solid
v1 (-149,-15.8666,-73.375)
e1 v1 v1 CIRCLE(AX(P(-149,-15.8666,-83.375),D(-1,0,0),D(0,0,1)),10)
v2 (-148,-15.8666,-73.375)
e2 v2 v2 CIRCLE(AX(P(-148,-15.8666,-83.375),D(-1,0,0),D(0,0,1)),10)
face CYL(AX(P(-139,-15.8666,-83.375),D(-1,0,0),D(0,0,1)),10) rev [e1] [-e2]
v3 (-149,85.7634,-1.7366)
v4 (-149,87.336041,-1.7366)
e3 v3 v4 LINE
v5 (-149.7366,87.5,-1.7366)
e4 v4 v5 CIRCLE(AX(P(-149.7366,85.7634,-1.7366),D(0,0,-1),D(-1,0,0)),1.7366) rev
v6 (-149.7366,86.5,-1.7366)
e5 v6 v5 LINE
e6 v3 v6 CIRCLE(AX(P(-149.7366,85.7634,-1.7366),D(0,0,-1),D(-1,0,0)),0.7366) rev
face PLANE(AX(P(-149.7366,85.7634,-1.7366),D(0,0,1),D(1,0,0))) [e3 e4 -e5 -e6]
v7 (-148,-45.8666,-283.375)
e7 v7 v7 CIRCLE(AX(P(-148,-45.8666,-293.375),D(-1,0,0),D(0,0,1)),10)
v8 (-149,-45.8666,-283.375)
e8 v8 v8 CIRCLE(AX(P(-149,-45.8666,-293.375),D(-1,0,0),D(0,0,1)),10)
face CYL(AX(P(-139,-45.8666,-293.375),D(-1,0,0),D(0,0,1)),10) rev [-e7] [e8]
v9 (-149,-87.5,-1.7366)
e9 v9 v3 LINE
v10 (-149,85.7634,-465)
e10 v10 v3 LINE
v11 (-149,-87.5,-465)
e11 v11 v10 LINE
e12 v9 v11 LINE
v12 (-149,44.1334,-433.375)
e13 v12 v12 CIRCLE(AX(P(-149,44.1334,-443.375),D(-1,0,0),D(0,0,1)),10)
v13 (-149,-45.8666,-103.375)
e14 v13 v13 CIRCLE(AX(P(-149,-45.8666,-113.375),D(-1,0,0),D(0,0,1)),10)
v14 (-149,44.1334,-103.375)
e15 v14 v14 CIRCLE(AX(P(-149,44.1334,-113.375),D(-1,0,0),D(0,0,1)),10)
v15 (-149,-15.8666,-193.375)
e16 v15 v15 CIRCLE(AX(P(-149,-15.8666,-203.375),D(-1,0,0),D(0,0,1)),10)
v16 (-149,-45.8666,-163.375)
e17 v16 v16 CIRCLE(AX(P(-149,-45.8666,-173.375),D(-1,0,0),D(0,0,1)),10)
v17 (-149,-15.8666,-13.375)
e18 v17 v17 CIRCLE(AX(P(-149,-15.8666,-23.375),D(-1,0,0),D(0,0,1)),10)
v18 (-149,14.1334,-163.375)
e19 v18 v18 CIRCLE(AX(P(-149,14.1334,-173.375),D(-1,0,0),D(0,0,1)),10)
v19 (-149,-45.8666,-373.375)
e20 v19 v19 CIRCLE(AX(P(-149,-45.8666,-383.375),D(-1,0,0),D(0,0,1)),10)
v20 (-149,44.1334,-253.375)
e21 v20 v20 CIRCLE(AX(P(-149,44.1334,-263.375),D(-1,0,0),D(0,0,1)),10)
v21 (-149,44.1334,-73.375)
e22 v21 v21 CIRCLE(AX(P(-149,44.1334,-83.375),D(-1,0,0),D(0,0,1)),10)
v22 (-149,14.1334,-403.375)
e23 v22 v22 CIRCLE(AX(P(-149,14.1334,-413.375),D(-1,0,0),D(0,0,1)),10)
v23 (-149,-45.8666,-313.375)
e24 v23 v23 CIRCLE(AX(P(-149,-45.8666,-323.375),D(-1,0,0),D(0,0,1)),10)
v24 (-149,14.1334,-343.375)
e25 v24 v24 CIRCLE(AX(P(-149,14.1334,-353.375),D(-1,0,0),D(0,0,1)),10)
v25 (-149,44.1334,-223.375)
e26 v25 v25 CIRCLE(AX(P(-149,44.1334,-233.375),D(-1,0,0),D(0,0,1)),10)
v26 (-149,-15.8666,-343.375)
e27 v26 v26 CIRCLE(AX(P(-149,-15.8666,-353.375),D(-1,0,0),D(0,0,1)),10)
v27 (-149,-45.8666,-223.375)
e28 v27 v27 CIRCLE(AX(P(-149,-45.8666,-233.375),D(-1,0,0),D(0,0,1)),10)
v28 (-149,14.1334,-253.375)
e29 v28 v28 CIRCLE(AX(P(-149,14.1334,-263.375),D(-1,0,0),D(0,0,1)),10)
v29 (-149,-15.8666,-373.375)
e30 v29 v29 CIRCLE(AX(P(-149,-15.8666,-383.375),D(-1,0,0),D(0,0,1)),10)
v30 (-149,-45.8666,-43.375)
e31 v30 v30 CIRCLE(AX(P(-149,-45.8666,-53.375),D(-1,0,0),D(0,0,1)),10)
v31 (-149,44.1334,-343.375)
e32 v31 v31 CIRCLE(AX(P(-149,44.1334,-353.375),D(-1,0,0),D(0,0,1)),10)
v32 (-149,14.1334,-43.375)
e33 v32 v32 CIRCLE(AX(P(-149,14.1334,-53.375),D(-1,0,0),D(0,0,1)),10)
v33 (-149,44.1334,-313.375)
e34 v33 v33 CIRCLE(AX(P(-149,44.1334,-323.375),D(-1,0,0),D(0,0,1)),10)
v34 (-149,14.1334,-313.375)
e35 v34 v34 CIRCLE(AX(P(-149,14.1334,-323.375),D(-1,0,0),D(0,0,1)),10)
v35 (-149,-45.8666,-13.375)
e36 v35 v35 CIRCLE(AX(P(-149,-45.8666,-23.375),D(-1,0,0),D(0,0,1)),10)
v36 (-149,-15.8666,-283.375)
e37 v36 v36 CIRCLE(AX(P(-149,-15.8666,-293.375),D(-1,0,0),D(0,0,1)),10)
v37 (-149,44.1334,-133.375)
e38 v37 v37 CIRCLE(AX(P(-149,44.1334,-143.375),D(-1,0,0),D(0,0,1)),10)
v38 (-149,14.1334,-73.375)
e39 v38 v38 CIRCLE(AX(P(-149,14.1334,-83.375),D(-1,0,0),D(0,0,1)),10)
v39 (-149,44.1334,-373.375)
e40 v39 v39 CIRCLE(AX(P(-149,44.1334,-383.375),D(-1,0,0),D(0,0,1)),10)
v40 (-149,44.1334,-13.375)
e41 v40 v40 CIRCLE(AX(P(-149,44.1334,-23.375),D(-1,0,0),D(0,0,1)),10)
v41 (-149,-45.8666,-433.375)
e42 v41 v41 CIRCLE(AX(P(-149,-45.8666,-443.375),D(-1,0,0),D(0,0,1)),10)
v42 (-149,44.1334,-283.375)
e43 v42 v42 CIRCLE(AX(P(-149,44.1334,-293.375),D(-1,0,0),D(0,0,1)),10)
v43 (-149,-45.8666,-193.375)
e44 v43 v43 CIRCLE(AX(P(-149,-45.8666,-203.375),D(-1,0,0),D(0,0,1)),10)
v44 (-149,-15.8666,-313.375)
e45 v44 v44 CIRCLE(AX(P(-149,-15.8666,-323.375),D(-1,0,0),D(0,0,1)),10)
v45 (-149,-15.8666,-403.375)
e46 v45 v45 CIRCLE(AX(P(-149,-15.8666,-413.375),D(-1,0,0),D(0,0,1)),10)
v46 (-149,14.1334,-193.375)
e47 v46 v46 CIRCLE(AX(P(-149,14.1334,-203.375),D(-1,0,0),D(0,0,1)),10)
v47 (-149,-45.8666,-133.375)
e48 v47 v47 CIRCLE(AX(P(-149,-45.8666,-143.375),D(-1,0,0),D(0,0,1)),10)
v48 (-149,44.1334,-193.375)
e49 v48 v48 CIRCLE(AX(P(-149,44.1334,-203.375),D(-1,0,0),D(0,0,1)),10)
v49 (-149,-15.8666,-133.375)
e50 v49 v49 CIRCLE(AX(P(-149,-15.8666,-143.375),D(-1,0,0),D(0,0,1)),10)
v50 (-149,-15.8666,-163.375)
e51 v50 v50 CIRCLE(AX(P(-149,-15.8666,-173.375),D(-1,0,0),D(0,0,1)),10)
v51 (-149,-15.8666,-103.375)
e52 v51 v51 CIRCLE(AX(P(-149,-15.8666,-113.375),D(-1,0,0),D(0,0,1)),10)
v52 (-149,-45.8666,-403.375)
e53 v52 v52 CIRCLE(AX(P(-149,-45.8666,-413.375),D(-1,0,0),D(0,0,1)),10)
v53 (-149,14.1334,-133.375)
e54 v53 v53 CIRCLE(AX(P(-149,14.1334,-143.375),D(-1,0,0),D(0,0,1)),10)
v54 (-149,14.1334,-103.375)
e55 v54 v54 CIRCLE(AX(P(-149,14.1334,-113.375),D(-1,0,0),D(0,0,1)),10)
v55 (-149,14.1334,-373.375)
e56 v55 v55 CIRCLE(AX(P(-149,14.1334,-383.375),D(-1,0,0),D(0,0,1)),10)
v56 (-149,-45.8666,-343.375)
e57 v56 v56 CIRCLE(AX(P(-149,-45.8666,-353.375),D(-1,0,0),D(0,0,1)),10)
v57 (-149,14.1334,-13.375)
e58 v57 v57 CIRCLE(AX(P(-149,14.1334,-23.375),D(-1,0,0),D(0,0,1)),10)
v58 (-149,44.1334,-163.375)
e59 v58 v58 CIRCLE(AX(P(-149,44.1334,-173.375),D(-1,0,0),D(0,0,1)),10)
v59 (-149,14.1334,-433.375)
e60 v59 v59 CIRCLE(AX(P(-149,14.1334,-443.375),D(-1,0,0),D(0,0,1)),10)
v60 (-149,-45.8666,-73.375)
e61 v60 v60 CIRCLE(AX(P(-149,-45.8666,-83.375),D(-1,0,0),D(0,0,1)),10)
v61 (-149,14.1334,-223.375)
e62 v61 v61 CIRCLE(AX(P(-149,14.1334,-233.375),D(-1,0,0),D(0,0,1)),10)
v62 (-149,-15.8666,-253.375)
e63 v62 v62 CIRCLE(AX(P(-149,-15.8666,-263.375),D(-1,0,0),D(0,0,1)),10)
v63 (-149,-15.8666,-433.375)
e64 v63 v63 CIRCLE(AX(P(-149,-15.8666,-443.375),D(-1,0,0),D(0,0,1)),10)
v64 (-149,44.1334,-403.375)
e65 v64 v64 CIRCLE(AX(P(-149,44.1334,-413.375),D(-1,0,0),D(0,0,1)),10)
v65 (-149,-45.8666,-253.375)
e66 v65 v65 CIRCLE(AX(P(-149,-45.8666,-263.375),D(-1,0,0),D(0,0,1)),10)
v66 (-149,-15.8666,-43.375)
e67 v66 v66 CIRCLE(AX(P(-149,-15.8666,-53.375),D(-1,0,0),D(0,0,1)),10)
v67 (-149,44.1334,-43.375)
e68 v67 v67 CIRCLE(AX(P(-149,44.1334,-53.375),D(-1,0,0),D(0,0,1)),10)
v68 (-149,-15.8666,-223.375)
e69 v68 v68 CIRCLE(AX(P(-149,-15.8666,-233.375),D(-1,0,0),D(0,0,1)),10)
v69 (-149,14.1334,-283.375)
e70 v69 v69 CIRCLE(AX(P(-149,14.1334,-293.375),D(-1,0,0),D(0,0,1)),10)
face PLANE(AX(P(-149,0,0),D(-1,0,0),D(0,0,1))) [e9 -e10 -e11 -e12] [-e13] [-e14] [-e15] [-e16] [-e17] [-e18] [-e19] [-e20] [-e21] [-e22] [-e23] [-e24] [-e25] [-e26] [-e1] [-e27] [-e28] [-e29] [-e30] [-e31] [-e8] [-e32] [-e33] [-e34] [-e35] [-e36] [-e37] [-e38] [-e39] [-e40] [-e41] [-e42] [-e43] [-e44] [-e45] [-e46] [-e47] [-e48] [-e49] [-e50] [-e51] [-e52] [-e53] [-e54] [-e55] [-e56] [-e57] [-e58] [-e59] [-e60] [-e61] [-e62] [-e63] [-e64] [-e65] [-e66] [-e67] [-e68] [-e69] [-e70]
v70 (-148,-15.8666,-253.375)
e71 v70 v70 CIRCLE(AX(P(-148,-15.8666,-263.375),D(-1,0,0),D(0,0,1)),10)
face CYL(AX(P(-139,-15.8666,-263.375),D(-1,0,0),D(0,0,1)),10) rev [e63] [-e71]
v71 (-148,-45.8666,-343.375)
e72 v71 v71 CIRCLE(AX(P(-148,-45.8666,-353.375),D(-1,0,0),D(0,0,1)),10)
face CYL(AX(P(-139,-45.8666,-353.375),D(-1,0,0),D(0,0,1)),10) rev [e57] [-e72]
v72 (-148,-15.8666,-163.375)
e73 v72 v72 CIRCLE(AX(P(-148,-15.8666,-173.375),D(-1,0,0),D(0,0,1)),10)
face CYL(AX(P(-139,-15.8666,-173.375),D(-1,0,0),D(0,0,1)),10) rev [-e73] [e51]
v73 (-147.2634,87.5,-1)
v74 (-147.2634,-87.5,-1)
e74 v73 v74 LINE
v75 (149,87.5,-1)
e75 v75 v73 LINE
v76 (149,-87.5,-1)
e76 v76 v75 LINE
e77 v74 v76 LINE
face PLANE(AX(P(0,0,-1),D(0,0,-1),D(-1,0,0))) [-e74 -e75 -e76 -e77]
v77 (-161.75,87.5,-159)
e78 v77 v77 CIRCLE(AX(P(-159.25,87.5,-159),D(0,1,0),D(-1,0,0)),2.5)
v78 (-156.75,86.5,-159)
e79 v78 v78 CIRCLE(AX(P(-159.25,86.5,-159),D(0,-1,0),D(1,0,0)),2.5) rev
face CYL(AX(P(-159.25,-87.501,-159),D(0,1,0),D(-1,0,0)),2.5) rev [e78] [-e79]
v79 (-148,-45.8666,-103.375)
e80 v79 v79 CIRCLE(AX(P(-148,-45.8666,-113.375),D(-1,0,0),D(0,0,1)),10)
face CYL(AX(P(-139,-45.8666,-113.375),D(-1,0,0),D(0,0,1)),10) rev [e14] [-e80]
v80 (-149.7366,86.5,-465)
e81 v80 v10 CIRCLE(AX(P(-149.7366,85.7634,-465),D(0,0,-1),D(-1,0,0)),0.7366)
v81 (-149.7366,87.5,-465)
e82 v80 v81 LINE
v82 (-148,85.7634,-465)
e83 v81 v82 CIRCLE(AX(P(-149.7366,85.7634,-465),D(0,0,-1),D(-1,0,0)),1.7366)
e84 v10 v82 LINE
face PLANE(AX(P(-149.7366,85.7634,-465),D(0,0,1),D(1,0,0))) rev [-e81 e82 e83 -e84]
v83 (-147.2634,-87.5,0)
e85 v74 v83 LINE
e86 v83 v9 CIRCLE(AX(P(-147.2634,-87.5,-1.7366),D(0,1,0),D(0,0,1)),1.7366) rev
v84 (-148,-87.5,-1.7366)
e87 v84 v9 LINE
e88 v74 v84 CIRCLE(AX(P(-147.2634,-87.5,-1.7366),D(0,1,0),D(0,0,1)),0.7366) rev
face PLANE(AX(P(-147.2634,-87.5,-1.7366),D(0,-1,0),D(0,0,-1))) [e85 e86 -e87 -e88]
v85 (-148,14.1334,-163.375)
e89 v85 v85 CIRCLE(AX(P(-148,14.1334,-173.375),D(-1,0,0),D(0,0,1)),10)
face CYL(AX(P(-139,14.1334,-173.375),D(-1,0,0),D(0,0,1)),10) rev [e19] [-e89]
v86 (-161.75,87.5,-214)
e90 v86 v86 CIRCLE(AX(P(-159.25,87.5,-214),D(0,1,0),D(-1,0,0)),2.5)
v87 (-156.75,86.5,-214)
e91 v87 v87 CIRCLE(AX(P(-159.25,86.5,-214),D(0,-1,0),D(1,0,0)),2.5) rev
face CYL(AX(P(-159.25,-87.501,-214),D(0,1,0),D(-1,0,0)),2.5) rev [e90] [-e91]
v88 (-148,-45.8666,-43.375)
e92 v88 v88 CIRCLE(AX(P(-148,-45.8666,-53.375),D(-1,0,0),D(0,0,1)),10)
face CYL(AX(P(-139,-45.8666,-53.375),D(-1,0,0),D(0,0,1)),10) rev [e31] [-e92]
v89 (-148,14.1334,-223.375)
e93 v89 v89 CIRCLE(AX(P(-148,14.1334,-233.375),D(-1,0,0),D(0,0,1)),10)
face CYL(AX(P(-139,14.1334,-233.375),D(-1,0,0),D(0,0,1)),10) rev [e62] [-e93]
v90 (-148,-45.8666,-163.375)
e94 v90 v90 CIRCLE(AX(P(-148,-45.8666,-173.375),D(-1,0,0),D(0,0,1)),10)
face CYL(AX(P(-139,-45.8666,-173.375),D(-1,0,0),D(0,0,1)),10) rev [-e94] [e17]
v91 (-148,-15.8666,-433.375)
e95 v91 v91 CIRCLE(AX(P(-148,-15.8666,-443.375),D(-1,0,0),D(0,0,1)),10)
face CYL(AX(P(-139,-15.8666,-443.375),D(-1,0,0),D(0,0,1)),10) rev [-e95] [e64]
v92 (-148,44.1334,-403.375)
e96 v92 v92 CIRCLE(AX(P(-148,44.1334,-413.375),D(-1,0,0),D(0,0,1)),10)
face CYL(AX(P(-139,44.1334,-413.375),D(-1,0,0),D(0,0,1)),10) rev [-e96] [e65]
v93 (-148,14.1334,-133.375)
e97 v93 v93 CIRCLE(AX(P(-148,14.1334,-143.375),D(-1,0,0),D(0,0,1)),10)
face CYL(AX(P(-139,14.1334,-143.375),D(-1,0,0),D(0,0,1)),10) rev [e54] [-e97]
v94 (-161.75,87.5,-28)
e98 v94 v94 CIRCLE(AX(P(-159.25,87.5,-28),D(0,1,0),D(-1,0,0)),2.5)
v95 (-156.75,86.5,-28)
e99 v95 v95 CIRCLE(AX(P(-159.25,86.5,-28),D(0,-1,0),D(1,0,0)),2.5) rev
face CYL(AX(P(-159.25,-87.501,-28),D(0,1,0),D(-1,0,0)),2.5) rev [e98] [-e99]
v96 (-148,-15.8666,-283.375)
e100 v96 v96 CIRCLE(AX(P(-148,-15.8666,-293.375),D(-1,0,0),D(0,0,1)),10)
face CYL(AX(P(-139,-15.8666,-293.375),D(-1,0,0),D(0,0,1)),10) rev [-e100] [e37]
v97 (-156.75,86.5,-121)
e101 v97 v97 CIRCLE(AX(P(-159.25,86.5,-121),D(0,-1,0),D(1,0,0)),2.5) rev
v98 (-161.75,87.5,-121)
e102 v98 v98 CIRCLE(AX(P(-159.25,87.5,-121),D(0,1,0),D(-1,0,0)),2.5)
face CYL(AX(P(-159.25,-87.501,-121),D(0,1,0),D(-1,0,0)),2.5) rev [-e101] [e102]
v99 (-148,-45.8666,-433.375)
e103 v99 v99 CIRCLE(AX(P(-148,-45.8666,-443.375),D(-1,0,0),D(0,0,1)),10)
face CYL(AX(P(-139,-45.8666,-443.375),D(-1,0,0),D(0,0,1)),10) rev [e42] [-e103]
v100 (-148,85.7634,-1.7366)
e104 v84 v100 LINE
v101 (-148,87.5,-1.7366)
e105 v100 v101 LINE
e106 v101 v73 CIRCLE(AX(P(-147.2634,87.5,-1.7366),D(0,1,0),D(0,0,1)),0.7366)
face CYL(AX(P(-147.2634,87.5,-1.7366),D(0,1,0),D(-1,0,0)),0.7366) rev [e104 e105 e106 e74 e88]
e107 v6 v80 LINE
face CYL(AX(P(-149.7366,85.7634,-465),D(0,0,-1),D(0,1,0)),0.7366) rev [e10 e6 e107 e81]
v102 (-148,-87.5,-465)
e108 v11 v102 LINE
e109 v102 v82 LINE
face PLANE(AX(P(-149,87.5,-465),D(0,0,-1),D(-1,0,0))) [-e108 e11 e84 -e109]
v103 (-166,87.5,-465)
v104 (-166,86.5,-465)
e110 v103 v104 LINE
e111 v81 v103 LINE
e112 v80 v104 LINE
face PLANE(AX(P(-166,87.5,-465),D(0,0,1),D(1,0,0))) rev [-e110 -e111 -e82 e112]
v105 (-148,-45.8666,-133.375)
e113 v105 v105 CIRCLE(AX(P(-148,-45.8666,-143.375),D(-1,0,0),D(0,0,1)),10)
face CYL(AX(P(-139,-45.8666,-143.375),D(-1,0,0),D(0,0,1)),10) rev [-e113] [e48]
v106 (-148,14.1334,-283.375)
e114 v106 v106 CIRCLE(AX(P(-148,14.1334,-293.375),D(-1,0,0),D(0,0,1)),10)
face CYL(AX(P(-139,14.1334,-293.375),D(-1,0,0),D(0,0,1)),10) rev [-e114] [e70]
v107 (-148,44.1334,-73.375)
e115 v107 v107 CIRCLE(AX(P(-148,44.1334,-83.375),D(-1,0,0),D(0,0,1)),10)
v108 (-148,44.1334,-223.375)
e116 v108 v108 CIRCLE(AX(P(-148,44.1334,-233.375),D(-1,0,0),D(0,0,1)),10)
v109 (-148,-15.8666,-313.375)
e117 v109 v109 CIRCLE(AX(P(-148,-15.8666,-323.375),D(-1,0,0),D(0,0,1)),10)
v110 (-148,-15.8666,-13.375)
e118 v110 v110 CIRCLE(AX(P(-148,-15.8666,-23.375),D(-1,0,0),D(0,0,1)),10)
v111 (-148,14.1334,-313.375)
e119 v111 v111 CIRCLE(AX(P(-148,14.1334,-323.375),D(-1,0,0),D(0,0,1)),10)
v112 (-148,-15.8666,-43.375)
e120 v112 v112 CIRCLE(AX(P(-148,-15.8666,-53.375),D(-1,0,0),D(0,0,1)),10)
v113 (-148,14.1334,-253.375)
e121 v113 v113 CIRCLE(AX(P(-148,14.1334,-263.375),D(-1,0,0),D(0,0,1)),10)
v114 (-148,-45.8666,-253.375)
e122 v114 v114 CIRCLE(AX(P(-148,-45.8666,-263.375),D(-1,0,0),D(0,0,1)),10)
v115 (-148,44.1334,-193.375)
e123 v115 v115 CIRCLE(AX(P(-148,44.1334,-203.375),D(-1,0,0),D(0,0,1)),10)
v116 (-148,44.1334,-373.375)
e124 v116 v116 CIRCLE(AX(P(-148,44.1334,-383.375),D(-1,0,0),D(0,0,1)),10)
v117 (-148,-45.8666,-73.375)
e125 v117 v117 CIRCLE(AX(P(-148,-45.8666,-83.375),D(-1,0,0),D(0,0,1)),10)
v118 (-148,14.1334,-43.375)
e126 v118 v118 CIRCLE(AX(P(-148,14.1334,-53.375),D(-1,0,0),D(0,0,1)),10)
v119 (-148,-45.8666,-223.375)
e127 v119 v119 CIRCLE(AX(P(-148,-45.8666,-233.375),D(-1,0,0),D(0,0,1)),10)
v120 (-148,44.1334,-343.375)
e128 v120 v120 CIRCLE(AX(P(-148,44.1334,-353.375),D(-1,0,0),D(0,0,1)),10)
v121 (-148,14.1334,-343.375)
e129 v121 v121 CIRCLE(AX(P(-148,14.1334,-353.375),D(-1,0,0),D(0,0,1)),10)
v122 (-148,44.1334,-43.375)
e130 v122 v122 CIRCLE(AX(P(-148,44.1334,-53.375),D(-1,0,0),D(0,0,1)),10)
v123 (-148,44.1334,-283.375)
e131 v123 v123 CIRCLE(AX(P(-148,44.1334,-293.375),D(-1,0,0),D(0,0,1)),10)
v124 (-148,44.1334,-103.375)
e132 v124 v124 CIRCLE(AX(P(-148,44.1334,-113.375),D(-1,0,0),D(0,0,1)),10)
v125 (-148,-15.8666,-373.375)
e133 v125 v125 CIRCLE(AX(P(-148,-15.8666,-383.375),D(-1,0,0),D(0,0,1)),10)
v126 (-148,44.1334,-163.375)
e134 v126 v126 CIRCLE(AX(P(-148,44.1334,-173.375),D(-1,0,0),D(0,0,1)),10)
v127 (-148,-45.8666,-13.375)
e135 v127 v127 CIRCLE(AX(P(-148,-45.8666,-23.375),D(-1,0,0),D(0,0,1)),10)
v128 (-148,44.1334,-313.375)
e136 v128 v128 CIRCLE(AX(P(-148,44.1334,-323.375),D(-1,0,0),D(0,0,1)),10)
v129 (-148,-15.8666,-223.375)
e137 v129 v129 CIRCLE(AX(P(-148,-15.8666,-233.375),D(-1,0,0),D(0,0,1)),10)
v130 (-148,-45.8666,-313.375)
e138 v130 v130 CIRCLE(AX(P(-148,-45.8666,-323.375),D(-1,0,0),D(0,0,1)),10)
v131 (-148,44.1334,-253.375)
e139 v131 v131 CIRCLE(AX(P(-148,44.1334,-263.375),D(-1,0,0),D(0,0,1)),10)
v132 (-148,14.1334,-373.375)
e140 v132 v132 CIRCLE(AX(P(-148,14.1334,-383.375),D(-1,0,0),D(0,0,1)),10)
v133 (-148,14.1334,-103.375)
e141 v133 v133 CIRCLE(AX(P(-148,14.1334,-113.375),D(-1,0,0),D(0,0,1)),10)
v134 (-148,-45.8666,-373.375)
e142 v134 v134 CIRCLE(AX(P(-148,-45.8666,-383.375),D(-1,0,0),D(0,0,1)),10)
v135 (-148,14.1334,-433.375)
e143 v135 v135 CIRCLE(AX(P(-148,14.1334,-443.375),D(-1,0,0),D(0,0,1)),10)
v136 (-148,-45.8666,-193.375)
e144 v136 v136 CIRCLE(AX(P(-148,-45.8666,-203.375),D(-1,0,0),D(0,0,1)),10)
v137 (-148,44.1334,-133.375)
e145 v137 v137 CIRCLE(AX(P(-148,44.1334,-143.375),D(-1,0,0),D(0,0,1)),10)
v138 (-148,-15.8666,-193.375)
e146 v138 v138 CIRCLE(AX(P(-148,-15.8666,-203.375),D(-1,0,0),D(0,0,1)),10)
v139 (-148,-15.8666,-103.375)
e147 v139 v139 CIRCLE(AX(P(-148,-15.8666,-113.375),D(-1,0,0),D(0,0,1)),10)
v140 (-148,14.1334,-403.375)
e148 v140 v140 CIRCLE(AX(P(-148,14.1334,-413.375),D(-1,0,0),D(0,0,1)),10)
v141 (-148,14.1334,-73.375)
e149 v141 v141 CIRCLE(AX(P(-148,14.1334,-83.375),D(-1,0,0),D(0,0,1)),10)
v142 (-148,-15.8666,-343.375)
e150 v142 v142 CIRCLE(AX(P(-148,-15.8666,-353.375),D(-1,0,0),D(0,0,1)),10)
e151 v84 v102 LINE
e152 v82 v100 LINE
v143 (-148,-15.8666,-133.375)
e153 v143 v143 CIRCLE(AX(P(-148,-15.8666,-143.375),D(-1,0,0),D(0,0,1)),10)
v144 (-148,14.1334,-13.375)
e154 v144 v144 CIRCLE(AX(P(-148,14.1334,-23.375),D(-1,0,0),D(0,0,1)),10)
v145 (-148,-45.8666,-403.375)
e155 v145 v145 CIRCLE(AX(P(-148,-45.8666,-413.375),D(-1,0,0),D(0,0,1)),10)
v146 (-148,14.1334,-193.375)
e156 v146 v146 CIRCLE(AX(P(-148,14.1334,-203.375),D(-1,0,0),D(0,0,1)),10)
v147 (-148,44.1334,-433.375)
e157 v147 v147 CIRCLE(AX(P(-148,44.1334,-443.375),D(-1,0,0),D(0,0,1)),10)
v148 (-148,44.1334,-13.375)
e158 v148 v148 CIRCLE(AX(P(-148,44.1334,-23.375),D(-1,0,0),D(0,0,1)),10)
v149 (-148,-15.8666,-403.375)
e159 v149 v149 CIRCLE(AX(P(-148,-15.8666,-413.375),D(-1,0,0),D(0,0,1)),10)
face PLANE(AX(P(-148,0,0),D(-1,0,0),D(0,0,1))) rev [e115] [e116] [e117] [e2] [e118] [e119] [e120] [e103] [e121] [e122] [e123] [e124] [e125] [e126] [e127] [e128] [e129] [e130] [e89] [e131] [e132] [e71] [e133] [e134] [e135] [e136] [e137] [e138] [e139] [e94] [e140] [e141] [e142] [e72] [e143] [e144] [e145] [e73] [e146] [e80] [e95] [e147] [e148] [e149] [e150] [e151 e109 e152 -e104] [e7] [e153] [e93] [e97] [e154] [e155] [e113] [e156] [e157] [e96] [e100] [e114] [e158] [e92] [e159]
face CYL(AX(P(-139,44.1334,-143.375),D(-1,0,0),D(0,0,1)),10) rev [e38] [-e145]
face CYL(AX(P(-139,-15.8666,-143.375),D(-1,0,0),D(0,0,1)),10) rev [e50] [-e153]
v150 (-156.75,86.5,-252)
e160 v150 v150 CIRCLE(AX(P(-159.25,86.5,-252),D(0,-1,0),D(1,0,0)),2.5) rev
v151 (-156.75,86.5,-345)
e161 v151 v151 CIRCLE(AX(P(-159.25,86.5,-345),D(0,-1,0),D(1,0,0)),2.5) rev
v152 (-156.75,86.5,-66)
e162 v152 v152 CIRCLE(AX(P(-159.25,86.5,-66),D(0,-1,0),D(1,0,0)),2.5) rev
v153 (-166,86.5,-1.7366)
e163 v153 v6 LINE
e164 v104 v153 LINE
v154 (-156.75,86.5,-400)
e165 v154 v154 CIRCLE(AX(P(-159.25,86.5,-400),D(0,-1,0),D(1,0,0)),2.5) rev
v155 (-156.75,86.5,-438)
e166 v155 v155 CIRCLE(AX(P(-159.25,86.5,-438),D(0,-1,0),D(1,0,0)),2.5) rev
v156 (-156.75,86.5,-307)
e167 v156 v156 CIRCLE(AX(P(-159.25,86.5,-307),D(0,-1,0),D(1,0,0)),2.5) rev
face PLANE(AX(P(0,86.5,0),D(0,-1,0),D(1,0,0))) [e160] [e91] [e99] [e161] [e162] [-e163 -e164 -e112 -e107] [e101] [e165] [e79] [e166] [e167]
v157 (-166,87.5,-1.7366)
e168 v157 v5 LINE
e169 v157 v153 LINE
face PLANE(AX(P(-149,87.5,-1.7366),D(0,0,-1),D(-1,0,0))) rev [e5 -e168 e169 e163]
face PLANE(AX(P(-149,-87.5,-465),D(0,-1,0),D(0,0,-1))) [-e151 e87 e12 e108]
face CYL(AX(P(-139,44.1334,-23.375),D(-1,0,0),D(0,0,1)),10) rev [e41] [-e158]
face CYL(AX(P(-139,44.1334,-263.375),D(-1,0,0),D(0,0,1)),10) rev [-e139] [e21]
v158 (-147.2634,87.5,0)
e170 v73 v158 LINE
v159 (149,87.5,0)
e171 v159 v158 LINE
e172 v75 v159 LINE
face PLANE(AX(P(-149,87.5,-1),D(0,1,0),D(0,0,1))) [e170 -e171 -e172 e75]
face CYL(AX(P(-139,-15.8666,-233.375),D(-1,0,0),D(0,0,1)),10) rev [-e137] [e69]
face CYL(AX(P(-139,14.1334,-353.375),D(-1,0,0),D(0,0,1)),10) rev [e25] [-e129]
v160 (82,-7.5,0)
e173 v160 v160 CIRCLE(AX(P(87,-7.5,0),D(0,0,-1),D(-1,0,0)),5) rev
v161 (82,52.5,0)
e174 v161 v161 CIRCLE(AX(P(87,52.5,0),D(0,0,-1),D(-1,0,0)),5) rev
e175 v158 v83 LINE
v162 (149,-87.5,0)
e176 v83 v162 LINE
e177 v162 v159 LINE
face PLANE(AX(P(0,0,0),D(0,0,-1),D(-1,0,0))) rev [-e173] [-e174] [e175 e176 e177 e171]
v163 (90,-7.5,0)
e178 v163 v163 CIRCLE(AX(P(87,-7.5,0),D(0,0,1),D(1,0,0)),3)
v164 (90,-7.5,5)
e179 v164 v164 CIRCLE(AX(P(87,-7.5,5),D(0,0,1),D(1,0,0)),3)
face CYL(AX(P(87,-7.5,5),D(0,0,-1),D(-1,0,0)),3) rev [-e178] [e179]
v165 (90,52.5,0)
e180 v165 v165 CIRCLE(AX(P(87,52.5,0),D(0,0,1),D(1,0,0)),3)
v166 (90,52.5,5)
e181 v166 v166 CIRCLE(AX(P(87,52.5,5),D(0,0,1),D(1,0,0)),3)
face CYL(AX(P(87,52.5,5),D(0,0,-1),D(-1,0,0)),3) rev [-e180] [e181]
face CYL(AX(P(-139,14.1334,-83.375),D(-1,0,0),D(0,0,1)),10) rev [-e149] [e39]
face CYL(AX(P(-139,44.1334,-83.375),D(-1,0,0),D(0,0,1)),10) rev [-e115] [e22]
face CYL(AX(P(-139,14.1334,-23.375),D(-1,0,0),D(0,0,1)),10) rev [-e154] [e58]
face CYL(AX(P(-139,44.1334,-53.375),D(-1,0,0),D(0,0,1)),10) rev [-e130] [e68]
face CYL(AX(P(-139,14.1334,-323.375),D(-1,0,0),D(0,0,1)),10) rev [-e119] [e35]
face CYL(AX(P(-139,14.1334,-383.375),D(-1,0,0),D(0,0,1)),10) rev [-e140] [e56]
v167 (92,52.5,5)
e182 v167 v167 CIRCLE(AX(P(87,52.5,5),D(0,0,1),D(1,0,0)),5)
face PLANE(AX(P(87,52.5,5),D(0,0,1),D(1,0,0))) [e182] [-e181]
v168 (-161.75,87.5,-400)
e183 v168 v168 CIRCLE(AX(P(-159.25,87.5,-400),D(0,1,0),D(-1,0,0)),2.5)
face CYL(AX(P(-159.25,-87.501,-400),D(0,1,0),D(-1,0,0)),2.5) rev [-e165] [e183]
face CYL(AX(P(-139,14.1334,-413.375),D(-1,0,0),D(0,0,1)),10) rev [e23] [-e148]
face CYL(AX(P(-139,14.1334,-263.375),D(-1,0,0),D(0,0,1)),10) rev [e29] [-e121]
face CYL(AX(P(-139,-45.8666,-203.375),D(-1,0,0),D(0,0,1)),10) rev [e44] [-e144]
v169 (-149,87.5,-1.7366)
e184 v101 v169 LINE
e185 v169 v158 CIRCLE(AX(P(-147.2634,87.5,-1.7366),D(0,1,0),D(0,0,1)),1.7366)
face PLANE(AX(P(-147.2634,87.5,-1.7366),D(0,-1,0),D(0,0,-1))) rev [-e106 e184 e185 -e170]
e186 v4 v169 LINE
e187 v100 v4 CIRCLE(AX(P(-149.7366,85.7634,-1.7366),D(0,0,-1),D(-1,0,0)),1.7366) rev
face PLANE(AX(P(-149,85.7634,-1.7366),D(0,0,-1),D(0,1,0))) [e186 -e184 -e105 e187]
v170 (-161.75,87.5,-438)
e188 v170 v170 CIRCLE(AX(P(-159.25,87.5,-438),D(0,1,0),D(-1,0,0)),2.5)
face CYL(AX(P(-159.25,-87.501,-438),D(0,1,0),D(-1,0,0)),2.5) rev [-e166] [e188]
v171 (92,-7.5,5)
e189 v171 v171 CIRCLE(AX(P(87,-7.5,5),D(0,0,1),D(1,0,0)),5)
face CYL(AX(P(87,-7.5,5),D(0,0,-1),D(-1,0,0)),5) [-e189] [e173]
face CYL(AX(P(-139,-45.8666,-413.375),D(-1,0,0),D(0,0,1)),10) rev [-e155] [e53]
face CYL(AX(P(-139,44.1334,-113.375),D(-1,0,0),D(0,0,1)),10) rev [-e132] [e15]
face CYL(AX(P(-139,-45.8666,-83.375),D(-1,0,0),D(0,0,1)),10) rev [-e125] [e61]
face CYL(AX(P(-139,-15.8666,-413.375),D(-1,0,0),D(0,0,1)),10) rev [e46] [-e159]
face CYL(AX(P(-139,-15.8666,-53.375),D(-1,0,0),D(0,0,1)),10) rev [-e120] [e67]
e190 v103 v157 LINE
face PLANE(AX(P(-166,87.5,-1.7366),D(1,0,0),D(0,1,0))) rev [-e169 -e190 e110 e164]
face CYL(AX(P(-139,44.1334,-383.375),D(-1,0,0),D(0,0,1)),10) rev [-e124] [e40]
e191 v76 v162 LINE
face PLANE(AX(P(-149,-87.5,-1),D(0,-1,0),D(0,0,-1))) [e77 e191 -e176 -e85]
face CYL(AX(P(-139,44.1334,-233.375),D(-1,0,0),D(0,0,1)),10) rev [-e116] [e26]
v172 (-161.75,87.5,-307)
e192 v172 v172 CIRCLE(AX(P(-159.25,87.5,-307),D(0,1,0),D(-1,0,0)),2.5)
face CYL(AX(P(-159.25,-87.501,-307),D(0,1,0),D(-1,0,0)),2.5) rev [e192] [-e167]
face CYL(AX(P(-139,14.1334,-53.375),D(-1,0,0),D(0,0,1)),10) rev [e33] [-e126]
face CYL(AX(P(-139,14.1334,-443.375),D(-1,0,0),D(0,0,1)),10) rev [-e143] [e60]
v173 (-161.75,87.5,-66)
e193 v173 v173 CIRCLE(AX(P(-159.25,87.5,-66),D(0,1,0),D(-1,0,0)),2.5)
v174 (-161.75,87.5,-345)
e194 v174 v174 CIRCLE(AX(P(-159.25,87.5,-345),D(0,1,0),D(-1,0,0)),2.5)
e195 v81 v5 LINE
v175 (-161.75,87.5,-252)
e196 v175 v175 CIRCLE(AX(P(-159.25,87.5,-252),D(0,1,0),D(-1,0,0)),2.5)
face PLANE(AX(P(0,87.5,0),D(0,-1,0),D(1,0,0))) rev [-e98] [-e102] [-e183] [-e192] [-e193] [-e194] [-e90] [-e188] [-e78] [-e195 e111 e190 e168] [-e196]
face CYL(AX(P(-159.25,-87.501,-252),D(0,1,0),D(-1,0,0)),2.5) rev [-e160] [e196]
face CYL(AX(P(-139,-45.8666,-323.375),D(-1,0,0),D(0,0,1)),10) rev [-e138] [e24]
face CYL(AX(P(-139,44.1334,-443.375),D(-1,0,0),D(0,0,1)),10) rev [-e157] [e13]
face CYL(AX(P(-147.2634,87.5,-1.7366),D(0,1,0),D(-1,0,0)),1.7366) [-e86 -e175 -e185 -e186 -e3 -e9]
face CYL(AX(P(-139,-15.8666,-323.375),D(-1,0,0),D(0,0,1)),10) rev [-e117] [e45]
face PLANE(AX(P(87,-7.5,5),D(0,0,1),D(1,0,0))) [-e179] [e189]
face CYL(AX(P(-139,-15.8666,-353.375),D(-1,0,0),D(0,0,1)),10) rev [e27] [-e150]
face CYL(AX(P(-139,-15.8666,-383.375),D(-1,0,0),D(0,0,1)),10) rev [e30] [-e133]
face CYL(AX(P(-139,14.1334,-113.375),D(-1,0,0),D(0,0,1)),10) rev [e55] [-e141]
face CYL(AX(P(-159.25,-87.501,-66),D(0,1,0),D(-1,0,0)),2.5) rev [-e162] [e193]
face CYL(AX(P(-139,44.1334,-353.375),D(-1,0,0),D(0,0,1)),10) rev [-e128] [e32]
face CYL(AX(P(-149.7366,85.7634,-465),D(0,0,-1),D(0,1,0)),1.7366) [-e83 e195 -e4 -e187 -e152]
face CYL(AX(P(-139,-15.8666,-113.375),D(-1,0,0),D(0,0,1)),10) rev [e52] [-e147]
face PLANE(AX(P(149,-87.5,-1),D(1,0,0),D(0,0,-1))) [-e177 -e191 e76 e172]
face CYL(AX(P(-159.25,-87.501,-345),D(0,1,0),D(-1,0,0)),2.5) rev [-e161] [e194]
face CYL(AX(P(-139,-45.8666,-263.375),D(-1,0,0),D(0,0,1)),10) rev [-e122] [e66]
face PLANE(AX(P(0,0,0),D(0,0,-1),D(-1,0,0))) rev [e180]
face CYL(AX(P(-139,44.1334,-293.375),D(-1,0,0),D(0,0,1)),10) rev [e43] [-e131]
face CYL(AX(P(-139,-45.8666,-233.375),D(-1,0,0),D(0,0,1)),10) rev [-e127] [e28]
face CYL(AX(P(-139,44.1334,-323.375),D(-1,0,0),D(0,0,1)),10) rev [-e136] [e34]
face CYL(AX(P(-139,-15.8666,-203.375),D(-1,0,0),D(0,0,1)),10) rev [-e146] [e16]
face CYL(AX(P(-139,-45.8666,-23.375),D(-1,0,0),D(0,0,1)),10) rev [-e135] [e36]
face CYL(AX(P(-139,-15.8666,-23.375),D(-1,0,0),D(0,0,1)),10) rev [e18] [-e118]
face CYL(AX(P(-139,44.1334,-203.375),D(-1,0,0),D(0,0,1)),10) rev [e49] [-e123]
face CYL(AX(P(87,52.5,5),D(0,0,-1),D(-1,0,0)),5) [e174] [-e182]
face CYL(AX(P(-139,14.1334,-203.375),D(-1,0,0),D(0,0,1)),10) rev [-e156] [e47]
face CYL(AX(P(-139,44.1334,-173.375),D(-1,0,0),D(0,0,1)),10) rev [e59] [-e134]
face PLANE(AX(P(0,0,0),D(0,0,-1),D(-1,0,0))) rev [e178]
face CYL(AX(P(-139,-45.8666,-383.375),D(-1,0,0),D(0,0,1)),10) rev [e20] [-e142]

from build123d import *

# Parameters (mm, degrees)
SKETCH1_W                    = 298
SKETCH1_H                    = 175
BASE_FLANGE1_DEPTH           = 1
EDGE_FLANGE1_STRIP_W         = 5.4732
EDGE_FLANGE1_STRIP_H         = 1
EDGE_FLANGE1_STRIP_CUT_DEPTH = 175
EDGE_FLANGE1_DEPTH           = 175
EDGE_FLANGE2_STRIP_W         = 5.4732
EDGE_FLANGE2_STRIP_H         = 1
EDGE_FLANGE2_STRIP_CUT_DEPTH = 463.2634
EDGE_FLANGE2_DEPTH           = 463.2634
SKETCH21_R                   = 5
SKETCH21_R_2                 = 3
BOSS_EXTRUDE2_DEPTH          = 5
SKETCH22_R                   = 10
CUT_EXTRUDE1_DEPTH           = 10
SKETCH24_R                   = 2.5
CUT_EXTRUDE2_DEPTH           = 1


# Sheet-metal steps are written as plain solids
with BuildPart() as part:
    # Sketch1 → Base-Flange1 (new body)
    with BuildSketch(Plane.XY):
        Rectangle(SKETCH1_W, SKETCH1_H)
    extrude(amount=-BASE_FLANGE1_DEPTH)

    # Edge-Flange1 strip (across the edge) → Edge-Flange1 strip cut (cut)
    with BuildSketch(Plane(origin=(-149, -87.5, -1), x_dir=(1, 0, 0), z_dir=(0, 1, 0))):
        with Locations((-1, -0.5)):
            Rectangle(EDGE_FLANGE1_STRIP_W, EDGE_FLANGE1_STRIP_H)
    extrude(amount=EDGE_FLANGE1_STRIP_CUT_DEPTH, mode=Mode.SUBTRACT)

    # Edge-Flange1 section (across the edge) → Edge-Flange1 (add)
    with BuildSketch(Plane(origin=(-149, -87.5, -1), x_dir=(1, 0, 0), z_dir=(0, 1, 0))):
        with BuildLine():
            Line((0, 0.7366), (0, 464))
            Line((0, 464), (1, 464))
            Line((1, 464), (1, 0.7366))
            ThreePointArc((1, 0.7366), (1.215745145, 0.215745145), (1.7366, 0))
            Line((1.7366, 0), (1.7366, -1))
            ThreePointArc((1.7366, -1), (0.508638364, -0.491361636), (0, 0.7366))
        make_face()
    extrude(amount=EDGE_FLANGE1_DEPTH)

    # Edge-Flange2 strip (across the edge) → Edge-Flange2 strip cut (cut)
    with BuildSketch(Plane(origin=(-149, 87.5, -1.7366), x_dir=(0, -1, 0), z_dir=(0, 0, -1))):
        with Locations((-1, -0.5)):
            Rectangle(EDGE_FLANGE2_STRIP_W, EDGE_FLANGE2_STRIP_H)
    extrude(amount=EDGE_FLANGE2_STRIP_CUT_DEPTH, mode=Mode.SUBTRACT)

    # Edge-Flange2 section (across the edge) → Edge-Flange2 (add)
    with BuildSketch(Plane(origin=(-149, 87.5, -1.7366), x_dir=(0, -1, 0), z_dir=(0, 0, -1))):
        with BuildLine():
            Line((0, 0.7366), (0, 17))
            Line((0, 17), (1, 17))
            Line((1, 17), (1, 0.7366))
            ThreePointArc((1, 0.7366), (1.215745145, 0.215745145), (1.7366, 0))
            Line((1.7366, 0), (1.7366, -1))
            ThreePointArc((1.7366, -1), (0.508638364, -0.491361636), (0, 0.7366))
        make_face()
    extrude(amount=EDGE_FLANGE2_DEPTH)

    # Sketch21 → Boss-Extrude2 (add)
    # profile 1 of 2: a face of its own
    with BuildSketch(Plane.XY):
        with Locations(Location((87, 52.5, 0), (0, 0, 180))):
            Circle(SKETCH21_R)
        with Locations((87, 52.5)):
            Circle(SKETCH21_R_2, mode=Mode.SUBTRACT)
    # profile 2 of 2: a face of its own
    with BuildSketch(Plane.XY):
        with Locations(Location((87, -7.5, 0), (0, 0, 180))):
            Circle(SKETCH21_R)
        with Locations((87, -7.5)):
            Circle(SKETCH21_R_2, mode=Mode.SUBTRACT)
    extrude(amount=BOSS_EXTRUDE2_DEPTH)

    # Sketch22 → Cut-Extrude1 (cut)
    with BuildSketch(Plane.ZY.offset(149)):
        with Locations((-443.375, 44.1334)):
            Circle(SKETCH22_R)
        with Locations((-413.375, 44.1334)):
            Circle(SKETCH22_R)
        with Locations((-383.375, 44.1334)):
            Circle(SKETCH22_R)
        with Locations((-353.375, 44.1334)):
            Circle(SKETCH22_R)
        with Locations((-323.375, 44.1334)):
            Circle(SKETCH22_R)
        with Locations((-293.375, 44.1334)):
            Circle(SKETCH22_R)
        with Locations((-263.375, 44.1334)):
            Circle(SKETCH22_R)
        with Locations((-233.375, 44.1334)):
            Circle(SKETCH22_R)
        with Locations((-203.375, 44.1334)):
            Circle(SKETCH22_R)
        with Locations((-173.375, 44.1334)):
            Circle(SKETCH22_R)
        with Locations((-143.375, 44.1334)):
            Circle(SKETCH22_R)
        with Locations((-113.375, 44.1334)):
            Circle(SKETCH22_R)
        with Locations((-83.375, 44.1334)):
            Circle(SKETCH22_R)
        with Locations((-413.375, 14.1334)):
            Circle(SKETCH22_R)
        with Locations((-383.375, 14.1334)):
            Circle(SKETCH22_R)
        with Locations((-353.375, 14.1334)):
            Circle(SKETCH22_R)
        with Locations((-323.375, 14.1334)):
            Circle(SKETCH22_R)
        with Locations((-293.375, 14.1334)):
            Circle(SKETCH22_R)
        with Locations((-263.375, 14.1334)):
            Circle(SKETCH22_R)
        with Locations((-233.375, 14.1334)):
            Circle(SKETCH22_R)
        with Locations((-203.375, 14.1334)):
            Circle(SKETCH22_R)
        with Locations((-173.375, 14.1334)):
            Circle(SKETCH22_R)
        with Locations((-143.375, 14.1334)):
            Circle(SKETCH22_R)
        with Locations((-113.375, 14.1334)):
            Circle(SKETCH22_R)
        with Locations((-83.375, 14.1334)):
            Circle(SKETCH22_R)
        with Locations((-413.375, -15.8666)):
            Circle(SKETCH22_R)
        with Locations((-383.375, -15.8666)):
            Circle(SKETCH22_R)
        with Locations((-353.375, -15.8666)):
            Circle(SKETCH22_R)
        with Locations((-323.375, -15.8666)):
            Circle(SKETCH22_R)
        with Locations((-293.375, -15.8666)):
            Circle(SKETCH22_R)
        with Locations((-263.375, -15.8666)):
            Circle(SKETCH22_R)
        with Locations((-233.375, -15.8666)):
            Circle(SKETCH22_R)
        with Locations((-203.375, -15.8666)):
            Circle(SKETCH22_R)
        with Locations((-173.375, -15.8666)):
            Circle(SKETCH22_R)
        with Locations((-143.375, -15.8666)):
            Circle(SKETCH22_R)
        with Locations((-113.375, -15.8666)):
            Circle(SKETCH22_R)
        with Locations((-83.375, -15.8666)):
            Circle(SKETCH22_R)
        with Locations((-413.375, -45.8666)):
            Circle(SKETCH22_R)
        with Locations((-383.375, -45.8666)):
            Circle(SKETCH22_R)
        with Locations((-353.375, -45.8666)):
            Circle(SKETCH22_R)
        with Locations((-323.375, -45.8666)):
            Circle(SKETCH22_R)
        with Locations((-293.375, -45.8666)):
            Circle(SKETCH22_R)
        with Locations((-263.375, -45.8666)):
            Circle(SKETCH22_R)
        with Locations((-233.375, -45.8666)):
            Circle(SKETCH22_R)
        with Locations((-203.375, -45.8666)):
            Circle(SKETCH22_R)
        with Locations((-173.375, -45.8666)):
            Circle(SKETCH22_R)
        with Locations((-143.375, -45.8666)):
            Circle(SKETCH22_R)
        with Locations((-113.375, -45.8666)):
            Circle(SKETCH22_R)
        with Locations((-83.375, -45.8666)):
            Circle(SKETCH22_R)
        with Locations((-443.375, 14.1334)):
            Circle(SKETCH22_R)
        with Locations((-443.375, -15.8666)):
            Circle(SKETCH22_R)
        with Locations((-443.375, -45.8666)):
            Circle(SKETCH22_R)
        with Locations((-53.375, 44.1334)):
            Circle(SKETCH22_R)
        with Locations((-23.375, 44.1334)):
            Circle(SKETCH22_R)
        with Locations((-53.375, 14.1334)):
            Circle(SKETCH22_R)
        with Locations((-23.375, 14.1334)):
            Circle(SKETCH22_R)
        with Locations((-53.375, -15.8666)):
            Circle(SKETCH22_R)
        with Locations((-23.375, -15.8666)):
            Circle(SKETCH22_R)
        with Locations((-53.375, -45.8666)):
            Circle(SKETCH22_R)
        with Locations((-23.375, -45.8666)):
            Circle(SKETCH22_R)
    extrude(amount=-CUT_EXTRUDE1_DEPTH, mode=Mode.SUBTRACT)

    # Sketch24 → Cut-Extrude2 (cut)
    with BuildSketch(Plane(origin=(0, 87.5, 0), x_dir=(1, 0, 0), z_dir=(0, 1, 0))):
        with Locations(Location((-159.25, 438, 0), (0, 0, 180))):
            Circle(SKETCH24_R)
        with Locations(Location((-159.25, 400, 0), (0, 0, 180))):
            Circle(SKETCH24_R)
        with Locations(Location((-159.25, 345, 0), (0, 0, 180))):
            Circle(SKETCH24_R)
        with Locations(Location((-159.25, 307, 0), (0, 0, 180))):
            Circle(SKETCH24_R)
        with Locations(Location((-159.25, 252, 0), (0, 0, 180))):
            Circle(SKETCH24_R)
        with Locations(Location((-159.25, 214, 0), (0, 0, 180))):
            Circle(SKETCH24_R)
        with Locations(Location((-159.25, 159, 0), (0, 0, 180))):
            Circle(SKETCH24_R)
        with Locations(Location((-159.25, 121, 0), (0, 0, 180))):
            Circle(SKETCH24_R)
        with Locations(Location((-159.25, 66, 0), (0, 0, 180))):
            Circle(SKETCH24_R)
        with Locations(Location((-159.25, 28, 0), (0, 0, 180))):
            Circle(SKETCH24_R)
    extrude(amount=-CUT_EXTRUDE2_DEPTH, mode=Mode.SUBTRACT)


solid = part.part
